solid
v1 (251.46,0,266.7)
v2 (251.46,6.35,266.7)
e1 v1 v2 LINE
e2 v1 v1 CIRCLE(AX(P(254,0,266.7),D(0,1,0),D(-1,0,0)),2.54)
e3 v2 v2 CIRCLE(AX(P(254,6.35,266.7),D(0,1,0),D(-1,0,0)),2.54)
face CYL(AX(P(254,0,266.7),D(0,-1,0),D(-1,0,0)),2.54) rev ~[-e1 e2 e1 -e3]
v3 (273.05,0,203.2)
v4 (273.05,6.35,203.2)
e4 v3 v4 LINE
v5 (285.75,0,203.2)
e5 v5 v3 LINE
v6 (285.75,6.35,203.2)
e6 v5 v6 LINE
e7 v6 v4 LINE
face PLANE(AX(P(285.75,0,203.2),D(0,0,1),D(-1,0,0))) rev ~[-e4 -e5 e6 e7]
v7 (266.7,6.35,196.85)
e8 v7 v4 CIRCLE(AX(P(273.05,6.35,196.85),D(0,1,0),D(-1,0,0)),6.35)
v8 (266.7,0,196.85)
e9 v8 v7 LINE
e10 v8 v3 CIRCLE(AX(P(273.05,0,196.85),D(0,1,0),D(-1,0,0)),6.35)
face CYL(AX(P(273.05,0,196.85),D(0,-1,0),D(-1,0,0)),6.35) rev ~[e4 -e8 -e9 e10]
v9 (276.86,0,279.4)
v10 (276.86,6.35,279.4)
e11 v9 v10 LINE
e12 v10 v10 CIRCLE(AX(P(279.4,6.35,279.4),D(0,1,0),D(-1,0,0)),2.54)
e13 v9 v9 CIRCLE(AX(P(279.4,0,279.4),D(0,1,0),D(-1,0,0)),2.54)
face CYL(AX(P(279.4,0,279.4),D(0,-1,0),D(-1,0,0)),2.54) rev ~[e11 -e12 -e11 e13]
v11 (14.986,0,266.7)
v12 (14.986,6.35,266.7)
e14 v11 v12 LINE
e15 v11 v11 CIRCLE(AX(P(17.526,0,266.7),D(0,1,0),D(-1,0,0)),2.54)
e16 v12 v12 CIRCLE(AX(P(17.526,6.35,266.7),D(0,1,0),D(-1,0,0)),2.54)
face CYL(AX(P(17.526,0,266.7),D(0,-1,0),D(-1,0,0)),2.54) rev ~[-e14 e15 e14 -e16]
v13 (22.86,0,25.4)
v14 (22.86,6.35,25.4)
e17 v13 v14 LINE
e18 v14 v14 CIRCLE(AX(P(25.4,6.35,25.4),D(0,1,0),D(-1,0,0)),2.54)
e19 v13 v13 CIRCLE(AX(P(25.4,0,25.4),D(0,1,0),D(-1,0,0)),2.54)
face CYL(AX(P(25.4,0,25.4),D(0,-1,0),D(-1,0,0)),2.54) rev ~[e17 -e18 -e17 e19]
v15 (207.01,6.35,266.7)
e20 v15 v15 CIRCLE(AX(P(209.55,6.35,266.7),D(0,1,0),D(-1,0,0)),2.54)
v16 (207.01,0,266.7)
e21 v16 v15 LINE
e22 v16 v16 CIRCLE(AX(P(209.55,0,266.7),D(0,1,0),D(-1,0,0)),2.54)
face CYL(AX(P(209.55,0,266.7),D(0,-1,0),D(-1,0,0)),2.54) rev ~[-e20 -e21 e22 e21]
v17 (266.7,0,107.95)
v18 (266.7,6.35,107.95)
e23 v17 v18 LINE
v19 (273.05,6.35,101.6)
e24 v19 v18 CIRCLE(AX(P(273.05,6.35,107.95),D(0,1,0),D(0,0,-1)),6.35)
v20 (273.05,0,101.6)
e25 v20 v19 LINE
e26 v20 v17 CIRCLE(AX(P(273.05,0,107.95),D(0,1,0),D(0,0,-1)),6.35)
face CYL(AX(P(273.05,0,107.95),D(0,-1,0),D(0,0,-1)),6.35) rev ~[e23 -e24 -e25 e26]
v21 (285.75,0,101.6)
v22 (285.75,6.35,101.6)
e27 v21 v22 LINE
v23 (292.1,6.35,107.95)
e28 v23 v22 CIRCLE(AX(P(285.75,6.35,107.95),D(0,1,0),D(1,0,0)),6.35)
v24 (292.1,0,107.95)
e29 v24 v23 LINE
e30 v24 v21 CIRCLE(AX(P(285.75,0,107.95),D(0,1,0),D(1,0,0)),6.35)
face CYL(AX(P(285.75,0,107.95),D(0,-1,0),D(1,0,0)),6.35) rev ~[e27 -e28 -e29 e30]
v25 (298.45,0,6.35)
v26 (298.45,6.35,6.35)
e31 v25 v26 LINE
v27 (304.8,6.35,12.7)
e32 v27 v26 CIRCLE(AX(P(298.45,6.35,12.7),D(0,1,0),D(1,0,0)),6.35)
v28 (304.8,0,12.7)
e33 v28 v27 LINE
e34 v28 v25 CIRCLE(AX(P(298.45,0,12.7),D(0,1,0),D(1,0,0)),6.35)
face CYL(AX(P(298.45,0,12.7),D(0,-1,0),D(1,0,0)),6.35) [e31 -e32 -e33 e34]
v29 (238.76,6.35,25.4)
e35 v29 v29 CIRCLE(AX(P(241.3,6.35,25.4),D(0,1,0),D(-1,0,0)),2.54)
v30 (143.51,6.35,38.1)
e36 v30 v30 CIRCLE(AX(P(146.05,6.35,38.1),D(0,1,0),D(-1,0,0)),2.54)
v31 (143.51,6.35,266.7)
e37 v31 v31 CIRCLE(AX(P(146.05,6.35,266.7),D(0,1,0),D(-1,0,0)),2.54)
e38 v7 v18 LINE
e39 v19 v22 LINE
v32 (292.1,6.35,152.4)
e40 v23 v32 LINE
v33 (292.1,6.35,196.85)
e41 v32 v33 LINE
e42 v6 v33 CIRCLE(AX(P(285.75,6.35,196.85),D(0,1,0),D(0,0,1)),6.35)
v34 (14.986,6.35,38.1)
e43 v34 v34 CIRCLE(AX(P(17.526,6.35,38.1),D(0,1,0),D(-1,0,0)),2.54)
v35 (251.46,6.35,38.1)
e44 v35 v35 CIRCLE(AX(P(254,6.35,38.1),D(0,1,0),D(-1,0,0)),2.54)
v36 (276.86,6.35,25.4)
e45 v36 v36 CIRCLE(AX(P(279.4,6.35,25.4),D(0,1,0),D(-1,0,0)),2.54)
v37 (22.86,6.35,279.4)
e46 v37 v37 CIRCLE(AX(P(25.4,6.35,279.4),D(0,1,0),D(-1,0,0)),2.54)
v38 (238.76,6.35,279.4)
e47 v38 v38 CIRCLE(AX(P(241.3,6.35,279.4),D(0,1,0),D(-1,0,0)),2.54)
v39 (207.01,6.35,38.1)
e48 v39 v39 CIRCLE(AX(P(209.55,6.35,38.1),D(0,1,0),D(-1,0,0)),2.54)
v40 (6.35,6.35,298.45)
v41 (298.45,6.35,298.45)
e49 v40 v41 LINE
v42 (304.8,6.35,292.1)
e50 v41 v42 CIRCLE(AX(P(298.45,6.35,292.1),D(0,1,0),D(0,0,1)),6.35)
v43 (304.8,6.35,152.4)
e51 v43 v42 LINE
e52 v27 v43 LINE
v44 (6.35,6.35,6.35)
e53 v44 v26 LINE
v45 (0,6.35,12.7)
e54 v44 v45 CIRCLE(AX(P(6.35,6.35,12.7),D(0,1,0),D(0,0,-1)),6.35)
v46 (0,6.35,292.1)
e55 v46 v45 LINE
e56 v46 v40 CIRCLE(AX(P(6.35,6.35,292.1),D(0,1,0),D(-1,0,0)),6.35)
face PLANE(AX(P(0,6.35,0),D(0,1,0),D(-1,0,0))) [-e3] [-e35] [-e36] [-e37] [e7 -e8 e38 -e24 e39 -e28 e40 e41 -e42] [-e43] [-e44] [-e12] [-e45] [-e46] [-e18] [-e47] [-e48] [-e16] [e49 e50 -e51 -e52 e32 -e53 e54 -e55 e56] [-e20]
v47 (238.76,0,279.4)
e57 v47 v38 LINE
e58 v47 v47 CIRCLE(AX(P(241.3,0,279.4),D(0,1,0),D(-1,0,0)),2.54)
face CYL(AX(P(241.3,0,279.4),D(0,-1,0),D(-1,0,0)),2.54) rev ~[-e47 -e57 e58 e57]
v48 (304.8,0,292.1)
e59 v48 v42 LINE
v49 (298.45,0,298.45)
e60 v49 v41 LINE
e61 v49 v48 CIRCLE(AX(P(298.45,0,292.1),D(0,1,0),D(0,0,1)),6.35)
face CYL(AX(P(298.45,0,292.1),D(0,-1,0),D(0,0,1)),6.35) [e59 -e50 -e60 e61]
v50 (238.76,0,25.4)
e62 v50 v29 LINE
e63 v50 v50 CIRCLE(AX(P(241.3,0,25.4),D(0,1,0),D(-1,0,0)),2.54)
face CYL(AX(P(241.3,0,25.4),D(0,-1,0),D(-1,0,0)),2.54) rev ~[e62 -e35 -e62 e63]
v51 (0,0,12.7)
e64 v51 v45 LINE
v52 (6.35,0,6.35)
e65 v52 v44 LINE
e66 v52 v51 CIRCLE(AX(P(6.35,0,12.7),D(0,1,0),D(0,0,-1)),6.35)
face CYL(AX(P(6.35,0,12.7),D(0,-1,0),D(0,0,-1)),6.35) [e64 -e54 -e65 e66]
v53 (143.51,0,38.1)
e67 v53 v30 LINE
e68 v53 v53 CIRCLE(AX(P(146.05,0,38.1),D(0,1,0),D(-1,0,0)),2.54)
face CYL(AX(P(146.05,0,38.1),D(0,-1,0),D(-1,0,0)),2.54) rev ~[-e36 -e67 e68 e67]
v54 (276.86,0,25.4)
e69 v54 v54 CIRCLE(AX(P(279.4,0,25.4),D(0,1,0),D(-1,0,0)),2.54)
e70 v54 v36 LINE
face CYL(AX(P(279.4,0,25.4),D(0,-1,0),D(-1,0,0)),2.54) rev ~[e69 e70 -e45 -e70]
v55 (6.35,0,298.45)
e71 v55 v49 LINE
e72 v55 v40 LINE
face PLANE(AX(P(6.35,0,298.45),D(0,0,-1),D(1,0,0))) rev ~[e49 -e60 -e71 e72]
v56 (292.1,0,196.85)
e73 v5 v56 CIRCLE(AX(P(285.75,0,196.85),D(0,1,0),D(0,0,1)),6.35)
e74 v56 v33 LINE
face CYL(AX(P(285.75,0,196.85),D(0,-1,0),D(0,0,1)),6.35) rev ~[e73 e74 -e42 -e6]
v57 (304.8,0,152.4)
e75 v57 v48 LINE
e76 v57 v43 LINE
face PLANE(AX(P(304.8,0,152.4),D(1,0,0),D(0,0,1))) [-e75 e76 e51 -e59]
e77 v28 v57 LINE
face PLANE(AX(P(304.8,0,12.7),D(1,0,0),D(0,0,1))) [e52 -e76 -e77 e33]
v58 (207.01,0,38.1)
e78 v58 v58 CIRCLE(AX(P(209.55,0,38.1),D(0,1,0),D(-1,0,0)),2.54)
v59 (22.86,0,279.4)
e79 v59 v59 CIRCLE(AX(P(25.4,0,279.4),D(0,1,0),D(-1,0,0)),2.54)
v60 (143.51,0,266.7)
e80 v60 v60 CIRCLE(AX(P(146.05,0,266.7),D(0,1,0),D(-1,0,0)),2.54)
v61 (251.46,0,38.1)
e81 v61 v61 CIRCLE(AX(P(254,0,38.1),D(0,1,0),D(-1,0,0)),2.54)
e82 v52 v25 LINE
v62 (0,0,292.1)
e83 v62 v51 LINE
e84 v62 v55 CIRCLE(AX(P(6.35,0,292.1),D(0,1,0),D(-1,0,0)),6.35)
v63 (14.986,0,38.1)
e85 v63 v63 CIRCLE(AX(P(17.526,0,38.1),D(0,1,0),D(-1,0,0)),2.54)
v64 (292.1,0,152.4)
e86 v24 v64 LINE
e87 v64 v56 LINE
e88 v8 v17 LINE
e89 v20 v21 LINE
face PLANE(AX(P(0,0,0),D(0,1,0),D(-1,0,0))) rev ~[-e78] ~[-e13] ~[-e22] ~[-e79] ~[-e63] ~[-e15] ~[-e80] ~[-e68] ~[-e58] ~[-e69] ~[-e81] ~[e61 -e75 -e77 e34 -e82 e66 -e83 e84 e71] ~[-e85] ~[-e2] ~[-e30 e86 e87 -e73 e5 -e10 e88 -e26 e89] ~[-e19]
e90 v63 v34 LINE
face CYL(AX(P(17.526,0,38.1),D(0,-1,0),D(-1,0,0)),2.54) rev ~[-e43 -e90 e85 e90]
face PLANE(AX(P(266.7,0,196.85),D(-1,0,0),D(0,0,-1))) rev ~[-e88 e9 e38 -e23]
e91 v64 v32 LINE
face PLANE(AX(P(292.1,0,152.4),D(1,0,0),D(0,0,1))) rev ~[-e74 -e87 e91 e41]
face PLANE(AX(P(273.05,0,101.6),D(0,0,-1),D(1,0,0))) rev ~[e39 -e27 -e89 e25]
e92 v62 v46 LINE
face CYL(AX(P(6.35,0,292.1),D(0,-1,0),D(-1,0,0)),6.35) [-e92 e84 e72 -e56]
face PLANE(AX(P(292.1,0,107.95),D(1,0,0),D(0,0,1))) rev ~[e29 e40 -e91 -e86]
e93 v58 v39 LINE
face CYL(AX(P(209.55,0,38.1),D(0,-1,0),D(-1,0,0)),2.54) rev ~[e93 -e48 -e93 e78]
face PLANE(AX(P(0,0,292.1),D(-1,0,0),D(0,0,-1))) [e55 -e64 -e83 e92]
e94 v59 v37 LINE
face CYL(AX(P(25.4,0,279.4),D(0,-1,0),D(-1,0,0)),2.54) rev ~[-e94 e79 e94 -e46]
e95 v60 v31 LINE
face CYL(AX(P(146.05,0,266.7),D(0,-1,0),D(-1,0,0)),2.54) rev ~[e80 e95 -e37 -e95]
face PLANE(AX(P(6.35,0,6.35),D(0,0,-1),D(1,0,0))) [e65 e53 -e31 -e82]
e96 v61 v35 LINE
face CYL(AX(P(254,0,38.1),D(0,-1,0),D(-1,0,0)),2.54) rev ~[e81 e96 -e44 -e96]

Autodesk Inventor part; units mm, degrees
ref_plane "YZ Plane" through (0, 0, 0) normal (1, 0, 0) x (0, 1, 0)
ref_plane "XZ Plane" through (0, 0, 0) normal (0, 1, 0) x (-1, 0, 0)
ref_plane "XY Plane" through (0, 0, 0) normal (0, 0, 1) x (1, 0, 0)
sketch "Sketch1" plane through (0, 0, 0) normal (0, 1, 0) x (-1, 0, 0)
  line L0 (-304.8, 25.4) -> (-279.4, 25.4) construction
  line L1 (0, 25.4) -> (-25.4, 25.4) construction
  line L2 (0, 279.4) -> (-25.4, 279.4) construction
  line L3 (-304.8, 279.4) -> (-279.4, 279.4) construction
  circle A0 centre (-25.4, 279.4) radius 2.54
  circle A1 centre (-279.4, 279.4) radius 2.54
  circle A2 centre (-25.4, 25.4) radius 2.54
  circle A3 centre (-279.4, 25.4) radius 2.54
  line L4 (-304.8, 38.1) -> (-254, 38.1) construction
  circle A4 centre (-254, 38.1) radius 2.54
  line L5 (-304.8, 152.4) -> (-230.2081, 152.4) construction
  line L6 (-254, 38.1) -> (-209.55, 38.1) construction
  line L7 (-209.55, 38.1) -> (-146.05, 38.1) construction
  line L8 (-146.05, 38.1) -> (-17.526, 38.1) construction
  circle A5 centre (-209.55, 38.1) radius 2.54
  circle A6 centre (-146.05, 38.1) radius 2.54
  circle A7 centre (-17.526, 38.1) radius 2.54
  circle A8 centre (-254, 266.7) radius 2.54
  circle A9 centre (-209.55, 266.7) radius 2.54
  circle A10 centre (-146.05, 266.7) radius 2.54
  circle A11 centre (-17.526, 266.7) radius 2.54
  line L9 (-6.35, 298.45) -> (-298.45, 298.45)
  line L10 (-6.35, 6.35) -> (-298.45, 6.35)
  line L11 (0, 292.1) -> (0, 12.7)
  line L12 (-304.8, 12.7) -> (-304.8, 292.1)
  line L13 (-304.8, 152.4) -> (-292.1, 152.4)
  line L14 (-292.1, 152.4) -> (-292.1, 196.85)
  line L15 (-285.75, 203.2) -> (-273.05, 203.2)
  line L16 (-266.7, 196.85) -> (-266.7, 107.95)
  line L17 (-273.05, 101.6) -> (-285.75, 101.6)
  line L18 (-292.1, 107.95) -> (-292.1, 152.4)
  arc A12 (-285.75, 203.2) -> (-292.1, 196.85) centre (-285.75, 196.85) ccw
  arc A13 (-292.1, 107.95) -> (-285.75, 101.6) centre (-285.75, 107.95) ccw
  arc A14 (-273.05, 101.6) -> (-266.7, 107.95) centre (-273.05, 107.95) ccw
  arc A15 (-266.7, 196.85) -> (-273.05, 203.2) centre (-273.05, 196.85) ccw
  arc A16 (-304.8, 12.7) -> (-298.45, 6.35) centre (-298.45, 12.7) ccw
  arc A17 (-298.45, 298.45) -> (-304.8, 292.1) centre (-298.45, 292.1) ccw
  arc A18 (0, 292.1) -> (-6.35, 298.45) centre (-6.35, 292.1) ccw
  arc A19 (-6.35, 6.35) -> (0, 12.7) centre (-6.35, 12.7) ccw
  line L19 (-279.4, 25.4) -> (-241.3, 25.4) construction
  circle A20 centre (-241.3, 25.4) radius 2.54
  circle A21 centre (-241.3, 279.4) radius 2.54
  point P0 (0, 0)
  point P1 (-292.1, 203.2)
  point P2 (-266.7, 203.2)
  point P3 (-266.7, 101.6)
  point P4 (-292.1, 101.6)
  dimension "d3" = 25.4
  dimension "d5" = 25.4
  dimension "d7" = 25.4
  dimension "d9" = 25.4
  dimension "d10" = 5.08
  dimension "d11" = 5.08
  dimension "d12" = 5.08
  dimension "d13" = 5.08
  dimension "d15" = 50.8
  dimension "d16" = 5.08
  dimension "d18" = 44.45
  dimension "d19" = 63.5
  dimension "d20" = 128.524
  dimension "d21" = 5.08
  dimension "d22" = 5.08
  dimension "d23" = 5.08
  dimension "d27" = 50.8
  dimension "d28" = 25.4
  dimension "d29" = 101.6
  dimension "d31" = 6.35
  dimension "d32" = 6.35
  dimension "d33" = 6.35
  dimension "d34" = 6.35
  dimension "d35" = 6.35
  dimension "d38" = 38.1
  dimension "d39" = 5.08
extrude "Extrusion2" add sketch "Sketch1" along normal blind 6.35
properties part number "vrRig_v08_breadboardToSlideMount"
